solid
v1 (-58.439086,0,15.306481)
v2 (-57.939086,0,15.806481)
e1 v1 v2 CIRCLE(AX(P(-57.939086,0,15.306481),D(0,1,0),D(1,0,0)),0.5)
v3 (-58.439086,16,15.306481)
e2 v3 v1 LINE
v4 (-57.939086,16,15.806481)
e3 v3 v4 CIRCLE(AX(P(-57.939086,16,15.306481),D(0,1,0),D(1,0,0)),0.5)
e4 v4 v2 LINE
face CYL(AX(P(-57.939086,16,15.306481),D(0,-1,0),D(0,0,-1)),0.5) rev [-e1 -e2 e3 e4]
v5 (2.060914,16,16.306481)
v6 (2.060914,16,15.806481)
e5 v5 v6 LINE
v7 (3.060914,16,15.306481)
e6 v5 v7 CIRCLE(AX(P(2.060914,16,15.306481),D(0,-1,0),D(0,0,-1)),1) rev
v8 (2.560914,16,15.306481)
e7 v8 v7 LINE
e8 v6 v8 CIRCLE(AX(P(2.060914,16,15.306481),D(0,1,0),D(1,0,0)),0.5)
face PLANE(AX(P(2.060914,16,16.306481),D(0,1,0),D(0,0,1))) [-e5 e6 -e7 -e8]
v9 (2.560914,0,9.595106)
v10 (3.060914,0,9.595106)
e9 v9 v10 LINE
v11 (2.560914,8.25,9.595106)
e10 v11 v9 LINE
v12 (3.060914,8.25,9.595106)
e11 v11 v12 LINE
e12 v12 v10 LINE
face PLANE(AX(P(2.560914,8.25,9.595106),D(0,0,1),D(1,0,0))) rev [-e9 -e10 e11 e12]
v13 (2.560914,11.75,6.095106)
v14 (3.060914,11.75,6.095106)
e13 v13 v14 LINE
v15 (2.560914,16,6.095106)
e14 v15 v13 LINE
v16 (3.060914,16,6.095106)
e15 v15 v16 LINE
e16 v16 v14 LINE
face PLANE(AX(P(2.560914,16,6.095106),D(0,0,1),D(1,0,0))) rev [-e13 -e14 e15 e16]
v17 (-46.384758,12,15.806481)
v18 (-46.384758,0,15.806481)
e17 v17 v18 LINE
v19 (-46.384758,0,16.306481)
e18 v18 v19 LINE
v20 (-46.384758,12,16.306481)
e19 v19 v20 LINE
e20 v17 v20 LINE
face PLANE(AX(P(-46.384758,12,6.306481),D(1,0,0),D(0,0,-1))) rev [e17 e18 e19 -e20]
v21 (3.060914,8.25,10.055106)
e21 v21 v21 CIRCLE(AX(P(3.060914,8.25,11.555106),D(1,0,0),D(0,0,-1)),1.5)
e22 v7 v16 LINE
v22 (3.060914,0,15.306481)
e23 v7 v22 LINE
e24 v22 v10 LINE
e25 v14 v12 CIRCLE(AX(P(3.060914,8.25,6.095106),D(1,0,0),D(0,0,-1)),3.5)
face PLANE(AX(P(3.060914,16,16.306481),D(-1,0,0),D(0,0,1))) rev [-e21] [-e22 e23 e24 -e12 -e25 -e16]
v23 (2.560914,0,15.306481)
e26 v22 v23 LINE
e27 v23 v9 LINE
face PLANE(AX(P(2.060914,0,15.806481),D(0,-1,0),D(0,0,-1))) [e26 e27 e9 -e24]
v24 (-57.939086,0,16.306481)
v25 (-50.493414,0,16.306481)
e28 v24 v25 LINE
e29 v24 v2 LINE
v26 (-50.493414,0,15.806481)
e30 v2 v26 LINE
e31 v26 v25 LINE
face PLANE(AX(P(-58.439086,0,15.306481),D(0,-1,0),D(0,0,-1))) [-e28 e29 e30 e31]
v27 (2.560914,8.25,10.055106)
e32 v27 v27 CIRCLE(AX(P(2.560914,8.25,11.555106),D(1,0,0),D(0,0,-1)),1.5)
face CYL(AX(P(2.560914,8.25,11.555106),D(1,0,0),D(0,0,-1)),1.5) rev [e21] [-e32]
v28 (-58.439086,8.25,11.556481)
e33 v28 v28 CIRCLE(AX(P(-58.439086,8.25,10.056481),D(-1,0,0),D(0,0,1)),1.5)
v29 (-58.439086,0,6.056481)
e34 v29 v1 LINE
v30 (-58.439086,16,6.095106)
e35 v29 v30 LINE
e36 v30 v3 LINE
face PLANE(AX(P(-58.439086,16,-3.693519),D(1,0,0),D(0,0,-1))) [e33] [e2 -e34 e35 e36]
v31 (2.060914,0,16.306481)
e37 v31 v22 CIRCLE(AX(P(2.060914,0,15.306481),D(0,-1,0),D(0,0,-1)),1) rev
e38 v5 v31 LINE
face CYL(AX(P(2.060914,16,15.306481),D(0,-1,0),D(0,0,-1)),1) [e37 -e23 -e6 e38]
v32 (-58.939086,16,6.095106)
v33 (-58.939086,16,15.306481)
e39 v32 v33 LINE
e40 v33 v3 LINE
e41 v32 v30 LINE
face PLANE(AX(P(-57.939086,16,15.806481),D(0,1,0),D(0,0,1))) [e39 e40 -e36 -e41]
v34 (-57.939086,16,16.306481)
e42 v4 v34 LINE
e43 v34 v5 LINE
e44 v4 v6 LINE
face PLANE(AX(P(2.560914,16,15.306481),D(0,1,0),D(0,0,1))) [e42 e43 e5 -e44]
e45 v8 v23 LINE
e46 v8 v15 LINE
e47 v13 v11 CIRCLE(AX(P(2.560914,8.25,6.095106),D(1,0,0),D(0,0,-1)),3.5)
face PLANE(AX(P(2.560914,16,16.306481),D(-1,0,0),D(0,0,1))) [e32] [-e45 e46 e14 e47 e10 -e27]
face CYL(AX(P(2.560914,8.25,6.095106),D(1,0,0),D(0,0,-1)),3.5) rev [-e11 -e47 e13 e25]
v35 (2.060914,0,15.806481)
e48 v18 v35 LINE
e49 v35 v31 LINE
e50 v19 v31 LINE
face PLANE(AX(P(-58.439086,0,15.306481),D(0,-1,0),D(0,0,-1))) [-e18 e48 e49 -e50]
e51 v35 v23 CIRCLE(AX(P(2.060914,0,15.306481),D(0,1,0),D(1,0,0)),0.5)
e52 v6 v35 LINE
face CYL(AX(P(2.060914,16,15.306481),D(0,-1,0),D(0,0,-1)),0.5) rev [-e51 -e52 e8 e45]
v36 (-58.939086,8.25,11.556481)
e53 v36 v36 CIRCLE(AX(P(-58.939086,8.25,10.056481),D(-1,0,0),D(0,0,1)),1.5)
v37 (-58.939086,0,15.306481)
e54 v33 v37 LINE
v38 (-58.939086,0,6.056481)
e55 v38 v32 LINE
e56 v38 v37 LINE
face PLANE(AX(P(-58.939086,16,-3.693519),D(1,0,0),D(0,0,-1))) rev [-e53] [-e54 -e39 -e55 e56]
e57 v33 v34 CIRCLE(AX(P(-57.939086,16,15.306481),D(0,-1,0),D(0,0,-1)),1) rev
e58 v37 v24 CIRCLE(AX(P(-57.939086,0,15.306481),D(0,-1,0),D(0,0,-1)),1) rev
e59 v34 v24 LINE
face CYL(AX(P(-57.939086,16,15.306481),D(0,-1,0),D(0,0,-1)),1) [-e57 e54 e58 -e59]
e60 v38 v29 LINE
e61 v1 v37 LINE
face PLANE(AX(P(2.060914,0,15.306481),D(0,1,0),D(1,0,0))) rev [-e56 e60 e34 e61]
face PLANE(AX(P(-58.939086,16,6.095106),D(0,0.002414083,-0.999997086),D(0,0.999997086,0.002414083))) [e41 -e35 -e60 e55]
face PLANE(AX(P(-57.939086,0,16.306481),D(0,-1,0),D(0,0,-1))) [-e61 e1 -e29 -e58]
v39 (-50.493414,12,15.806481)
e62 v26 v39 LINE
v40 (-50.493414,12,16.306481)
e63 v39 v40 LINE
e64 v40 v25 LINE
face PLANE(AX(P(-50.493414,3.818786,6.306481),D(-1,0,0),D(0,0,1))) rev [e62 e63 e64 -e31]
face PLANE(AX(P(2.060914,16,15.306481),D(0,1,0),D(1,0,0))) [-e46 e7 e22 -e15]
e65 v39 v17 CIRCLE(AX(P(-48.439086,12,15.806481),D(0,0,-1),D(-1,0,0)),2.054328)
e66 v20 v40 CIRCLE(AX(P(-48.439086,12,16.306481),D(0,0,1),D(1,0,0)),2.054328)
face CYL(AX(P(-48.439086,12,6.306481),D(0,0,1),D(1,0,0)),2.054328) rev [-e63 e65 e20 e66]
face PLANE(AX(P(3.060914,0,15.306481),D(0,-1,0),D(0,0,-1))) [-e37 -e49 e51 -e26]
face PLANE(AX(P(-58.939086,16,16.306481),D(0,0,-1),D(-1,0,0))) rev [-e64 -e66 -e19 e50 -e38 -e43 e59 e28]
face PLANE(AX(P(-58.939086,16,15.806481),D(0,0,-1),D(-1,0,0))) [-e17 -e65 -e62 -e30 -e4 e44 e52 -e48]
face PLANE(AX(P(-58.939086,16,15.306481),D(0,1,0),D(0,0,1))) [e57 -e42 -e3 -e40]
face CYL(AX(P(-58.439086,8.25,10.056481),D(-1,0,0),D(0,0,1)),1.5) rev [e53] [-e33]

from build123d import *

# Parameters (mm, degrees)
BRIDA_BASE1_DEPTH     = 16
CROQUIS6_R            = 1.5
CORTAR_EXTRUIR6_DEPTH = 0.5
CROQUIS7_R            = 1.5
CORTAR_EXTRUIR7_DEPTH = 0.5
CORTAR_EXTRUIR8_DEPTH = 10


# Sheet-metal steps are written as plain solids
with BuildPart() as part:
    # Croquis1 → Brida base1 (new body)
    with BuildSketch(Plane(origin=(0, 0, 0), x_dir=(1, 0, 0), z_dir=(0, 1, 0))):
        with BuildLine():
            Line((-58.939086294, 3.693519459), (-58.939086294, -15.306480541))
            ThreePointArc((-58.939086294, -15.306480541), (-58.646193076, -16.013587323), (-57.939086294, -16.306480541))
            Line((-57.939086294, -16.306480541), (2.060913706, -16.306480541))
            ThreePointArc((2.060913706, -16.306480541), (2.768020487, -16.013587323), (3.060913706, -15.306480541))
            Line((3.060913706, -15.306480541), (3.060913706, 3.693519459))
            Line((3.060913706, 3.693519459), (2.560913706, 3.693519459))
            Line((2.560913706, 3.693519459), (2.560913706, -15.306480541))
            ThreePointArc((2.560913706, -15.306480541), (2.414467096, -15.660033932), (2.060913706, -15.806480541))
            Line((2.060913706, -15.806480541), (-57.939086294, -15.806480541))
            ThreePointArc((-57.939086294, -15.806480541), (-58.292639685, -15.660033932), (-58.439086294, -15.306480541))
            Line((-58.439086294, -15.306480541), (-58.439086294, 3.693519459))
            Line((-58.439086294, 3.693519459), (-58.939086294, 3.693519459))
        make_face()
    extrude(amount=BRIDA_BASE1_DEPTH)

    # Croquis6 → Cortar-Extruir6 (cut)
    with BuildSketch(Plane(origin=(3.060913706, 0, 0), x_dir=(0, 0, -1), z_dir=(1, 0, 0))):
        with Locations((-11.555105987, 8.25)):
            Circle(CROQUIS6_R)
        with BuildLine():
            Line((-9.595105987, 8.25), (-9.595105987, 0))
            Line((-9.595105987, 0), (3.693519459, 0))
            Line((3.693519459, 0), (3.693519459, 16))
            Line((3.693519459, 16), (-6.095105987, 16))
            Line((-6.095105987, 16), (-6.095105987, 11.75))
            ThreePointArc((-6.095105987, 11.75), (-8.569979721, 10.724873734), (-9.595105987, 8.25))
        make_face()
    extrude(amount=-CORTAR_EXTRUIR6_DEPTH, mode=Mode.SUBTRACT)

    # Croquis7 → Cortar-Extruir7 (cut)
    with BuildSketch(Plane.ZY.offset(58.939086294)):
        with Locations((10.056480541, 8.25)):
            Circle(CROQUIS7_R)
        Polygon((6.095105987, 16), (6.056480541, 0), (-3.693519459, 0), (-3.693519459, 16), align=None)
    extrude(amount=-CORTAR_EXTRUIR7_DEPTH, mode=Mode.SUBTRACT)

    # Croquis8 → Cortar-Extruir8 (cut)
    with BuildSketch(Plane.XY.offset(16.306480541)):
        with BuildLine():
            Line((-50.493414499, 12), (-50.493414499, 3.818786101))
            Line((-50.493414499, 3.818786101), (-50.493414499, 0))
            Line((-50.493414499, 0), (-46.38475809, 0))
            Line((-46.38475809, 0), (-46.38475809, 3.818786101))
            Line((-46.38475809, 3.818786101), (-46.38475809, 12))
            ThreePointArc((-46.38475809, 12), (-48.439086294, 14.054328205), (-50.493414499, 12))
        make_face()
    extrude(amount=-CORTAR_EXTRUIR8_DEPTH, mode=Mode.SUBTRACT)


solid = part.part
